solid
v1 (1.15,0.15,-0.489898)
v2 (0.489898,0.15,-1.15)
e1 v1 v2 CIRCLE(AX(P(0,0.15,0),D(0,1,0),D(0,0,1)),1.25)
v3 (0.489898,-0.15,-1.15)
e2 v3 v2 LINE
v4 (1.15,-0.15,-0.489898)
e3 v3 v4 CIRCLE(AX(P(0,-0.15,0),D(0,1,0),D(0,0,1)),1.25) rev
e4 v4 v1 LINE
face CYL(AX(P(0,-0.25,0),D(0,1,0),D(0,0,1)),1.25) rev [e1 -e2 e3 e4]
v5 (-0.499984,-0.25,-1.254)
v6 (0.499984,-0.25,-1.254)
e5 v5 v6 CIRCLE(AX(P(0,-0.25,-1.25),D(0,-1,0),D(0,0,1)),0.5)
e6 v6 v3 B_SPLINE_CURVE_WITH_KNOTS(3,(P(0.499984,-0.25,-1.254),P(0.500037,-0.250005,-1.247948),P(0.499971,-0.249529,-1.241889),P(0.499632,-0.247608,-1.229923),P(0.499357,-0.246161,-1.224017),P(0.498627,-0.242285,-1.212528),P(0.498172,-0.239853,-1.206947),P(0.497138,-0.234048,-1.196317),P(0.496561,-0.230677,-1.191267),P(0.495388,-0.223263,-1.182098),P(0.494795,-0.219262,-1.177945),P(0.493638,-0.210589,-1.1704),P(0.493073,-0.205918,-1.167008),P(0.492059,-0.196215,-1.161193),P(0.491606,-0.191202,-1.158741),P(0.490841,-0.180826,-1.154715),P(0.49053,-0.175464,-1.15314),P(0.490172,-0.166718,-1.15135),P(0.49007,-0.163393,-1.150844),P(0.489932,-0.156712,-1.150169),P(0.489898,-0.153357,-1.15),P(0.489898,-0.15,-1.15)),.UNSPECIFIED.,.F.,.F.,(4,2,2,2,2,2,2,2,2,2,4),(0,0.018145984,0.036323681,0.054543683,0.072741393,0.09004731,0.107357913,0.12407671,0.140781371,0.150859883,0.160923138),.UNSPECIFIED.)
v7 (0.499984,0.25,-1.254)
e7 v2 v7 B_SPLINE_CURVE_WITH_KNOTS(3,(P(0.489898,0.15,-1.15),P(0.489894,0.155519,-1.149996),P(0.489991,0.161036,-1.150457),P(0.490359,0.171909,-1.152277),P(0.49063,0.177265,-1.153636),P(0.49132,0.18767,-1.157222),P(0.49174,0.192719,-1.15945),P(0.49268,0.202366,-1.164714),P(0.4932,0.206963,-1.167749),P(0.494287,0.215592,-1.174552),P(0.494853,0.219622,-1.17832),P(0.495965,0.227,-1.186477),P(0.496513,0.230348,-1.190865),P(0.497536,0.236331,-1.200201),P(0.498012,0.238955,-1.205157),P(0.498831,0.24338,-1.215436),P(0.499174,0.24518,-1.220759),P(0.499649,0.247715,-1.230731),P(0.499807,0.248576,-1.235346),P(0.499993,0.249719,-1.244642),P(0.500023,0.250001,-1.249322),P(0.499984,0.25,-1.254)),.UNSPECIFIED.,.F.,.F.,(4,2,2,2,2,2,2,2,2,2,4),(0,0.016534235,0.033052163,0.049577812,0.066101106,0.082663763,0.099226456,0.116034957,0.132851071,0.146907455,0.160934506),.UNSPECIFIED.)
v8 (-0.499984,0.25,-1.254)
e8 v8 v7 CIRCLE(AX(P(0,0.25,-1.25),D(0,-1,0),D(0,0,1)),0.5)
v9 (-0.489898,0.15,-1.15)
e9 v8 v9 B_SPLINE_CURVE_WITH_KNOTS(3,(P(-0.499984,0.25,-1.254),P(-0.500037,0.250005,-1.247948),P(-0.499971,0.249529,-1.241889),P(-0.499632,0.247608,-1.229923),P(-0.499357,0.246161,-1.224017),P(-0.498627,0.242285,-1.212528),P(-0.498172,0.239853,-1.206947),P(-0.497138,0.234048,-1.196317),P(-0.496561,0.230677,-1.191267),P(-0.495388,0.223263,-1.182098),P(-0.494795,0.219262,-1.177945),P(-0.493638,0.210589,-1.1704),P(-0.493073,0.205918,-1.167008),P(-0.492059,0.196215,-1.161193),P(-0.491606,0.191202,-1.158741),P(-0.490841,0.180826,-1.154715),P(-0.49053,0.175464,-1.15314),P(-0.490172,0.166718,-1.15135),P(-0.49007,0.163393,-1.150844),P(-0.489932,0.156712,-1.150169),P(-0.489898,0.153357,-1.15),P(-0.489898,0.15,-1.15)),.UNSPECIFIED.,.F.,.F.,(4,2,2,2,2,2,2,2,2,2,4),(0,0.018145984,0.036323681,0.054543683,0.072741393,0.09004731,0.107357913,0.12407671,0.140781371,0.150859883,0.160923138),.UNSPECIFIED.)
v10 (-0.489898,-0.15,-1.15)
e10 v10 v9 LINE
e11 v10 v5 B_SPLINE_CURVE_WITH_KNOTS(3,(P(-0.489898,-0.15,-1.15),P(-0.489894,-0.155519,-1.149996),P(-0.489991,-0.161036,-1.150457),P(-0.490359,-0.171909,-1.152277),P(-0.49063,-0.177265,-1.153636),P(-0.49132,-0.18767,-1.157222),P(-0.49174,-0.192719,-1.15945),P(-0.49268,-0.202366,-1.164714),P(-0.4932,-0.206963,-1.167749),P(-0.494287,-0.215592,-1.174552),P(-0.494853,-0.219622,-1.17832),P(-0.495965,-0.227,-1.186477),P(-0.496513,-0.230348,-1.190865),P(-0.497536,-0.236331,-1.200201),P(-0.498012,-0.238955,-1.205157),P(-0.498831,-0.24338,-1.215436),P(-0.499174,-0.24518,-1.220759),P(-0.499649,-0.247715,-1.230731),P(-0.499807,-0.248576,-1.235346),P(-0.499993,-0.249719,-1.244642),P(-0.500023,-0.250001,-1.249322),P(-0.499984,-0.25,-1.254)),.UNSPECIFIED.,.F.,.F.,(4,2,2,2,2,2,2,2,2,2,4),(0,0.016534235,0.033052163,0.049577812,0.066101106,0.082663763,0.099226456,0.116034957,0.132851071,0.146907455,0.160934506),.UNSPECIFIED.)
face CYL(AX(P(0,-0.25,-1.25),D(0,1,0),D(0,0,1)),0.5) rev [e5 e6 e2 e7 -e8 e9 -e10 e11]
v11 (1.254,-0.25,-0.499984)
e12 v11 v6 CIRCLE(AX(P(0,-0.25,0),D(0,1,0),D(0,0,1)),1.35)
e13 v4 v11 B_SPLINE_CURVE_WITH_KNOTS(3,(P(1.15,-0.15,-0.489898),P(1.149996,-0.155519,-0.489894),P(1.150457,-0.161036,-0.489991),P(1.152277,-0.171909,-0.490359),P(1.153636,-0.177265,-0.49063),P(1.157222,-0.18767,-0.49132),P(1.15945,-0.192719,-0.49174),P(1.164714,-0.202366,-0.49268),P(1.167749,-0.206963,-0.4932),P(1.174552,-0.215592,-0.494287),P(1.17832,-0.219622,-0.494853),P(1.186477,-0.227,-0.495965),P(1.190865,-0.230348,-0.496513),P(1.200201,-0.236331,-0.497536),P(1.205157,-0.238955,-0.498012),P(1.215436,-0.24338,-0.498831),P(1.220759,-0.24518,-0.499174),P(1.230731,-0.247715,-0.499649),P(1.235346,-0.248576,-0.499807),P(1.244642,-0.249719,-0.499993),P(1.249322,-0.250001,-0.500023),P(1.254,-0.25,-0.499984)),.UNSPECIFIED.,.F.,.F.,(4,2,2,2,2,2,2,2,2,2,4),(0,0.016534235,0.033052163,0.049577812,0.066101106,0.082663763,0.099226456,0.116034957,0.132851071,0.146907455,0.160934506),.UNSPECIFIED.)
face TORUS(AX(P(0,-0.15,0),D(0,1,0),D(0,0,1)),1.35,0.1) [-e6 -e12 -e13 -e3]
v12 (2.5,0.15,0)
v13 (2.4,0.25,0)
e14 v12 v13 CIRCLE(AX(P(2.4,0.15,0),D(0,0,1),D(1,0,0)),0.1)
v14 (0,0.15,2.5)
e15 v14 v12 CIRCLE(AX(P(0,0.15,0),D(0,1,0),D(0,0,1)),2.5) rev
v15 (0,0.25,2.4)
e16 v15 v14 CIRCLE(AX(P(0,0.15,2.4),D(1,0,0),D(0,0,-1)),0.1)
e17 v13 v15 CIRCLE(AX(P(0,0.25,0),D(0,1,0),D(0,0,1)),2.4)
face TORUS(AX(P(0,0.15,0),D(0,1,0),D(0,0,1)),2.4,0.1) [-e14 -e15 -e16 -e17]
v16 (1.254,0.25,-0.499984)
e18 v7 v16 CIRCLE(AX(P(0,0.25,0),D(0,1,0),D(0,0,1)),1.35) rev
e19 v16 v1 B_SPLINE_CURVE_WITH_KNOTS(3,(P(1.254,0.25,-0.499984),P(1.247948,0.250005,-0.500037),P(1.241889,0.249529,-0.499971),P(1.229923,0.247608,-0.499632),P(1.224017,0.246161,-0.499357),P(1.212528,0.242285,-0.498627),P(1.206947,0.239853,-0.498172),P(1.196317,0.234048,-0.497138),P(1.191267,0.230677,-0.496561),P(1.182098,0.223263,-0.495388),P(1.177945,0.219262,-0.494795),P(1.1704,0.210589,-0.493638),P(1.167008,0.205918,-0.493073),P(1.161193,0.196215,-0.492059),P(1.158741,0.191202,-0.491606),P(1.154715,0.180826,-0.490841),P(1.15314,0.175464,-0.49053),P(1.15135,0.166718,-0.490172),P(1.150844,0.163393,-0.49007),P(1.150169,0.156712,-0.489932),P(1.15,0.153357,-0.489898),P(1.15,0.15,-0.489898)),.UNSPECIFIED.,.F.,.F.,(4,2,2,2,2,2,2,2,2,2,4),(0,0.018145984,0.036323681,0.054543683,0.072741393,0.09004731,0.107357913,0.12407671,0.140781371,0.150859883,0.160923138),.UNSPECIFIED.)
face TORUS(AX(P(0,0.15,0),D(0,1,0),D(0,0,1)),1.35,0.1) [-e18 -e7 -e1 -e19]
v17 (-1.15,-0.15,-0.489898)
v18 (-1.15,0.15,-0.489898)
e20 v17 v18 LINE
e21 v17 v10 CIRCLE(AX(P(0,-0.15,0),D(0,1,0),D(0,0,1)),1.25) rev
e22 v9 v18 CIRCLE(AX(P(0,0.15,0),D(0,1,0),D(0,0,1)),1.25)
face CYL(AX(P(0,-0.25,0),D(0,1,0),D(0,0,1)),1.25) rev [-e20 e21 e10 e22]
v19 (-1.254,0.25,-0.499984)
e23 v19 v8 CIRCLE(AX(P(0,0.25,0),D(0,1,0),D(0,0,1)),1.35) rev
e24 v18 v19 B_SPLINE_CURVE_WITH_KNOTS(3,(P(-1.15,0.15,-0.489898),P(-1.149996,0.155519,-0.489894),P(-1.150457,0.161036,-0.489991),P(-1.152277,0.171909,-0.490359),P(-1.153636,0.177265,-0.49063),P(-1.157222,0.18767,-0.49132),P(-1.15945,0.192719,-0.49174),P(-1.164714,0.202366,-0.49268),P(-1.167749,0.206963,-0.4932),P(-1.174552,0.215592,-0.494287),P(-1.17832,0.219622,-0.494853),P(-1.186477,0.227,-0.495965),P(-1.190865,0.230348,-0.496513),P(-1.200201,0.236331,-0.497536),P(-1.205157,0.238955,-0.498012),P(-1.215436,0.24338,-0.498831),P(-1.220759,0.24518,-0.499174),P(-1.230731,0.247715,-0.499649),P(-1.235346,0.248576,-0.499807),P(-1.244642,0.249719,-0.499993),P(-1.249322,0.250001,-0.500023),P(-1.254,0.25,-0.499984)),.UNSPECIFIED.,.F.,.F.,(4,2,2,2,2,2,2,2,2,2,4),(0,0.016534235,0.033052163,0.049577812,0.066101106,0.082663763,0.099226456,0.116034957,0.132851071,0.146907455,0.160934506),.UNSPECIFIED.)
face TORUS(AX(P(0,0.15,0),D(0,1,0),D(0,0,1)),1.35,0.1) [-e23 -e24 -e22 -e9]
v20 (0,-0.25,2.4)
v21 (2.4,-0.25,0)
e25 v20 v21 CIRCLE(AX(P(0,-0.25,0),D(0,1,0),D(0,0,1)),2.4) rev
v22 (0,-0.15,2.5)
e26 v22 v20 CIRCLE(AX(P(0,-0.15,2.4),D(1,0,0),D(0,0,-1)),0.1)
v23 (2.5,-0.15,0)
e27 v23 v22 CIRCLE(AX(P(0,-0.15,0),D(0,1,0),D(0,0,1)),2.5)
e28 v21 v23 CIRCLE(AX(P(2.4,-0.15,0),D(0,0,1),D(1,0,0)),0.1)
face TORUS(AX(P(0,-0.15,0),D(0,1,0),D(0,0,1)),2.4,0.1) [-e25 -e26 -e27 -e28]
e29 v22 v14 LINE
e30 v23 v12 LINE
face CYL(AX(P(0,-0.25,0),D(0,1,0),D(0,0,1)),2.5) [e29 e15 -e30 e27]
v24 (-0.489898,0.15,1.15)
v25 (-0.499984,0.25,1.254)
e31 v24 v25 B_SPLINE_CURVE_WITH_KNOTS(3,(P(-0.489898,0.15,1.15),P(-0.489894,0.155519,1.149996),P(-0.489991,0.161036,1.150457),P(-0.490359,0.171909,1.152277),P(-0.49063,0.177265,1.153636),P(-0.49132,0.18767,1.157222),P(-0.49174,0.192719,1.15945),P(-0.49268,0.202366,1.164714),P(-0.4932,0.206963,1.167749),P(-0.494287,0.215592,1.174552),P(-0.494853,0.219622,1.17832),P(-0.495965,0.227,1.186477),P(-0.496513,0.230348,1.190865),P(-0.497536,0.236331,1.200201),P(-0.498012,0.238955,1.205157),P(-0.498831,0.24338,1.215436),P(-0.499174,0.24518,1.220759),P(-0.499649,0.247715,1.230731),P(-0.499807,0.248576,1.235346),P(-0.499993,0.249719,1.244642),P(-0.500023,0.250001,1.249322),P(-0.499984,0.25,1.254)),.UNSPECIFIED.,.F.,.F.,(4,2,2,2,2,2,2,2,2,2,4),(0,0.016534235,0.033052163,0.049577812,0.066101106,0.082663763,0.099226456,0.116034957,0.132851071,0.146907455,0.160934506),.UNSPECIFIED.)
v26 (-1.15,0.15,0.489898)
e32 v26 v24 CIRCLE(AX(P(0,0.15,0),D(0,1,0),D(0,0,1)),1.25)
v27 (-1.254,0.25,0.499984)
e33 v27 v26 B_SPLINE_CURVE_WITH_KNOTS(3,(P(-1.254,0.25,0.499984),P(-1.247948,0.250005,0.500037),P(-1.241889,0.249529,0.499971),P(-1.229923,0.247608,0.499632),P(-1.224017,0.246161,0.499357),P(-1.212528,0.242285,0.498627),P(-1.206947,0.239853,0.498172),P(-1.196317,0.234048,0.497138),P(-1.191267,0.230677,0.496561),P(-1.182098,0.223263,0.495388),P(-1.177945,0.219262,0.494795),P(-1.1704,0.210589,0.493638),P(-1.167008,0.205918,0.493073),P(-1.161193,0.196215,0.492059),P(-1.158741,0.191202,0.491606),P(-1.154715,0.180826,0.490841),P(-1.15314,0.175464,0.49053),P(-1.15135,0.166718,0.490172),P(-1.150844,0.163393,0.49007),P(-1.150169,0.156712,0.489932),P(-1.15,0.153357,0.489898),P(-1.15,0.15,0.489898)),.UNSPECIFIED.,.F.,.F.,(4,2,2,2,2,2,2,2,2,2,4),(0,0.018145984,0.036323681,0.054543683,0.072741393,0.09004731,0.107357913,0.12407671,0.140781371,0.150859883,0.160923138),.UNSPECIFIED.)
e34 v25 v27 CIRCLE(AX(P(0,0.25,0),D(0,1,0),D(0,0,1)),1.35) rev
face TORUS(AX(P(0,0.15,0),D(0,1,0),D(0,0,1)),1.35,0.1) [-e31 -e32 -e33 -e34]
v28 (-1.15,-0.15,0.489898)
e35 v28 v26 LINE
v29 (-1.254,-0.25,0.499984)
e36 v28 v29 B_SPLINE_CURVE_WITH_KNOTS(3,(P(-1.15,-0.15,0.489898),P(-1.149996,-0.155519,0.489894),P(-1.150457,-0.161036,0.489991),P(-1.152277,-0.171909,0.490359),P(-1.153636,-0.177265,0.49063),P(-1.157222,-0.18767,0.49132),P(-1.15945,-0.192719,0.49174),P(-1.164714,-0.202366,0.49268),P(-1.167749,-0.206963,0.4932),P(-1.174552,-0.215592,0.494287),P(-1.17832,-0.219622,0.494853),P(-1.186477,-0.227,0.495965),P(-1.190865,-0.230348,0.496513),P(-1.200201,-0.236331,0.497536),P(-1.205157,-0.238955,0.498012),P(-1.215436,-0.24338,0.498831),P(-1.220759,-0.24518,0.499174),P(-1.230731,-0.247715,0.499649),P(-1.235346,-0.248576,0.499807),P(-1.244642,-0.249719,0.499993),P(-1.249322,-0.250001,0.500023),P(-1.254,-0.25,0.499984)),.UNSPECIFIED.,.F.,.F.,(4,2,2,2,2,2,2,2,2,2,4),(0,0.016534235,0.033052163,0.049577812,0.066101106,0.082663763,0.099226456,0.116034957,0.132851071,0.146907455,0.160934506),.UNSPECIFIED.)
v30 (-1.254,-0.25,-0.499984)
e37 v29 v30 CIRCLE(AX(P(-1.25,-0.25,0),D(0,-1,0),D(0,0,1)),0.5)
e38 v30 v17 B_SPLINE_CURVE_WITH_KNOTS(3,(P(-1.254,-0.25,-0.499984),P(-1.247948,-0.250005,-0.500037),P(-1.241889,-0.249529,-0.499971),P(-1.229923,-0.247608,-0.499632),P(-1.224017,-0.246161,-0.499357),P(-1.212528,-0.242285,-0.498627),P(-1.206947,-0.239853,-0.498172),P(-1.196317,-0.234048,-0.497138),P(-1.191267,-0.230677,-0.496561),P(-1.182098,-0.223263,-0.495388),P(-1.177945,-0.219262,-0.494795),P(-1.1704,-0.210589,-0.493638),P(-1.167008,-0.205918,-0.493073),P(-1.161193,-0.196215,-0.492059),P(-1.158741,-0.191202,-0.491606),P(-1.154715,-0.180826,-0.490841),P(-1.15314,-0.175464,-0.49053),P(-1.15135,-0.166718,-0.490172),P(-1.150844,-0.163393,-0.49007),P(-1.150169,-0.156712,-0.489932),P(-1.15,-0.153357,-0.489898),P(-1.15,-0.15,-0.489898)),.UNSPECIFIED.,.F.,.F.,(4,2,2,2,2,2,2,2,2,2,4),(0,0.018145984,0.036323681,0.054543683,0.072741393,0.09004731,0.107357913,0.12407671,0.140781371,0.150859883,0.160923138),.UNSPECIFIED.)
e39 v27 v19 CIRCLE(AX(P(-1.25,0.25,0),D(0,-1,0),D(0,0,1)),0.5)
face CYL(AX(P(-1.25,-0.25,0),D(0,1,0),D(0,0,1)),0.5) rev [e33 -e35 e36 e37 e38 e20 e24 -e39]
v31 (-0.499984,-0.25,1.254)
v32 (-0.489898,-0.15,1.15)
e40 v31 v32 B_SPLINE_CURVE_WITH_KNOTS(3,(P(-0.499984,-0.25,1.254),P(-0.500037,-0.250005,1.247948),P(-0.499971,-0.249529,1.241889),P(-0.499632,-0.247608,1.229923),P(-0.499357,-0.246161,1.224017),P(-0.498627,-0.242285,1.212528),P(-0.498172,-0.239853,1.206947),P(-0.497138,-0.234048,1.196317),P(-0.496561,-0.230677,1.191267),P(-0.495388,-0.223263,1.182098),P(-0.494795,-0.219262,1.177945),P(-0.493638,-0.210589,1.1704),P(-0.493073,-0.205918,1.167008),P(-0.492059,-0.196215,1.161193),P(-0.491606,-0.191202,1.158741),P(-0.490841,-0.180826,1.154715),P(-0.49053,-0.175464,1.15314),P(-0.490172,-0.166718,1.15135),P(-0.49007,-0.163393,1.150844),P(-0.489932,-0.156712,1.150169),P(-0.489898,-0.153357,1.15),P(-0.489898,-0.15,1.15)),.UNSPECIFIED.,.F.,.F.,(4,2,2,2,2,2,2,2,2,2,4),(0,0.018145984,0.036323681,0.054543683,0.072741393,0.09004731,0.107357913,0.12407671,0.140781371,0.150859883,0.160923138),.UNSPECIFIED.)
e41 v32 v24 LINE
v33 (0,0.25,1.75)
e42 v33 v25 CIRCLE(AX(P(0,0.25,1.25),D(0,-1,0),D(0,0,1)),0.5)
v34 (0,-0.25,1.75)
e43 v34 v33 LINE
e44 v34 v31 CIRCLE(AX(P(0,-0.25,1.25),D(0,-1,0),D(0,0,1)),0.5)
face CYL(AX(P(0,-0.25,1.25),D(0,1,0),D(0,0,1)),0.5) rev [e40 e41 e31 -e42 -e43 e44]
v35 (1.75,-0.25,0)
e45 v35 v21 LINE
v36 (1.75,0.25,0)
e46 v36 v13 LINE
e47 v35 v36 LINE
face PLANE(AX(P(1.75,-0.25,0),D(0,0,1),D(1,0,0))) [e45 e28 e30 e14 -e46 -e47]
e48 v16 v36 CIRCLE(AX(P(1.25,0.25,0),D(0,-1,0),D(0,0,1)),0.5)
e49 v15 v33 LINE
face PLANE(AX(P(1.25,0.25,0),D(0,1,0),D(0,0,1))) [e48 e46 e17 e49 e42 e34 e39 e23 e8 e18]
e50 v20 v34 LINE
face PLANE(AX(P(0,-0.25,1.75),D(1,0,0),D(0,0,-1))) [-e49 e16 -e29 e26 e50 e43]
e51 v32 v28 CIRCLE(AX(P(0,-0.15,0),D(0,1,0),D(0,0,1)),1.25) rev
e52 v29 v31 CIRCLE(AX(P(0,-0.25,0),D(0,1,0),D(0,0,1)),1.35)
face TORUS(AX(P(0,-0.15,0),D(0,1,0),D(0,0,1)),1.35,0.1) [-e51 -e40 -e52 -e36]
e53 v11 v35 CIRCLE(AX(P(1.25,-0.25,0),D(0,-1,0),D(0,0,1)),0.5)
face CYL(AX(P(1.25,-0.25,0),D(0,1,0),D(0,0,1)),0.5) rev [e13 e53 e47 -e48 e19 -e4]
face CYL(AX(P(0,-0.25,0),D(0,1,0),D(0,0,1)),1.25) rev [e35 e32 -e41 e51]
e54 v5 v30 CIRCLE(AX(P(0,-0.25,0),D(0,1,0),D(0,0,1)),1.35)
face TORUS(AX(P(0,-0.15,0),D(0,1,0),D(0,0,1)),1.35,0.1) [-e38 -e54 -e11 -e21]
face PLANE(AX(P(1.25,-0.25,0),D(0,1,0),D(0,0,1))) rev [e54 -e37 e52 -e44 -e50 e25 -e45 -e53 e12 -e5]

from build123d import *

# Parameters (mm, degrees)
BOSS_EXTRUDE1_DEPTH      = 0.25
BOSS_EXTRUDE1_DEPTH_BACK = 0.25
FILLET1_R                = 0.1


with BuildPart() as part:
    # Sketch1 → Boss-Extrude1 (new, two sides: drawn at the far end of the back side and taken through both)
    with BuildSketch(Plane(origin=(0, 0, 0), x_dir=(1, 0, 0), z_dir=(0, 1, 0)).offset(-BOSS_EXTRUDE1_DEPTH_BACK)):
        with BuildLine():
            Line((0, -1.75), (0, -2.5))
            ThreePointArc((0, -2.5), (-1.767766953, 1.767766953), (2.5, 0))
            Line((2.5, 0), (1.75, 0))
            ThreePointArc((1.75, 0), (1.566227766, 0.387298335), (1.15, 0.489897949))
            ThreePointArc((1.15, 0.489897949), (0.883883476, 0.883883476), (0.489897949, 1.15))
            ThreePointArc((0.489897949, 1.15), (0, 1.75), (-0.489897949, 1.15))
            ThreePointArc((-0.489897949, 1.15), (-0.883883476, 0.883883476), (-1.15, 0.489897949))
            ThreePointArc((-1.15, 0.489897949), (-1.75, 0), (-1.15, -0.489897949))
            ThreePointArc((-1.15, -0.489897949), (-0.883883476, -0.883883476), (-0.489897949, -1.15))
            ThreePointArc((-0.489897949, -1.15), (-0.387298335, -1.566227766), (0, -1.75))
        make_face()
    extrude(amount=BOSS_EXTRUDE1_DEPTH + BOSS_EXTRUDE1_DEPTH_BACK)

    # Fillet1
    # the kernel refuses this fillet: 0.1 mm, written as the material it takes off along each edge
    with BuildSketch(Plane(origin=(0, -0.25, 0), x_dir=(0.10019395208705734, 0, 0.9949679250936567), z_dir=(0.9949679250936567, 0, -0.10019395208705734))) as fillet1_piece_1:
        with BuildLine():
            CenterArc((2.5 - FILLET1_R, -FILLET1_R), FILLET1_R, 0, 90)
            Line((2.5 - FILLET1_R, 0), (2.5, 0))
            Line((2.5, 0), (2.5, -FILLET1_R))
        make_face()
    revolve(axis=Axis((0, -0.25, 0), (0, -1, 0)), revolution_arc=281.500678412, mode=Mode.SUBTRACT)
    with BuildSketch(Plane(origin=(0, -0.25, 0), x_dir=(-0.9795272488285965, 0, 0.2013116211307253), z_dir=(-0.2013116211307253, 0, -0.9795272488285965))) as fillet1_piece_2:
        with BuildLine():
            CenterArc((1.25 + FILLET1_R, FILLET1_R), FILLET1_R, 180, 90)
            Line((1.25 + FILLET1_R, 0), (1.25, 0))
            Line((1.25, 0), (1.25, FILLET1_R))
        make_face()
    revolve(axis=Axis((0, -0.25, 0), (0, 1, 0)), revolution_arc=66.772660904, mode=Mode.SUBTRACT)
    with BuildSketch(Plane(origin=(0, -0.25, 0), x_dir=(-0.20131162113072518, 0, -0.9795272488285967), z_dir=(0.9795272488285967, 0, -0.20131162113072518))) as fillet1_piece_3:
        with BuildLine():
            CenterArc((1.25 + FILLET1_R, FILLET1_R), FILLET1_R, 180, 90)
            Line((1.25 + FILLET1_R, 0), (1.25, 0))
            Line((1.25, 0), (1.25, FILLET1_R))
        make_face()
    revolve(axis=Axis((0, -0.25, 0), (0, 1, 0)), revolution_arc=66.772660904, mode=Mode.SUBTRACT)
    with BuildSketch(Plane(origin=(0, 0.25, 0), x_dir=(0.10019395208705734, 0, 0.9949679250936567), z_dir=(0.9949679250936567, 0, -0.10019395208705734))) as fillet1_piece_4:
        with BuildLine():
            CenterArc((2.5 - FILLET1_R, FILLET1_R), FILLET1_R, 270, 90)
            Line((2.5 - FILLET1_R, 0), (2.5, 0))
            Line((2.5, 0), (2.5, FILLET1_R))
        make_face()
    revolve(axis=Axis((0, 0.25, 0), (0, -1, 0)), revolution_arc=281.500678412, mode=Mode.SUBTRACT)
    with BuildSketch(Plane(origin=(0, 0.25, 0), x_dir=(-0.9795272488285965, 0, 0.2013116211307253), z_dir=(-0.2013116211307253, 0, -0.9795272488285965))) as fillet1_piece_5:
        with BuildLine():
            CenterArc((1.25 + FILLET1_R, -FILLET1_R), FILLET1_R, 90, 90)
            Line((1.25 + FILLET1_R, 0), (1.25, 0))
            Line((1.25, 0), (1.25, -FILLET1_R))
        make_face()
    revolve(axis=Axis((0, 0.25, 0), (0, 1, 0)), revolution_arc=66.772660904, mode=Mode.SUBTRACT)
    with BuildSketch(Plane(origin=(0, 0.25, 0), x_dir=(-0.20131162113072518, 0, -0.9795272488285967), z_dir=(0.9795272488285967, 0, -0.20131162113072518))) as fillet1_piece_6:
        with BuildLine():
            CenterArc((1.25 + FILLET1_R, -FILLET1_R), FILLET1_R, 90, 90)
            Line((1.25 + FILLET1_R, 0), (1.25, 0))
            Line((1.25, 0), (1.25, -FILLET1_R))
        make_face()
    revolve(axis=Axis((0, 0.25, 0), (0, 1, 0)), revolution_arc=66.772660904, mode=Mode.SUBTRACT)
    with BuildSketch(Plane(origin=(0, 0.25, 0), x_dir=(0.9795272488285964, 0, -0.20131162113072643), z_dir=(0.20131162113072643, 0, 0.9795272488285964))) as fillet1_piece_7:
        with BuildLine():
            CenterArc((1.25 + FILLET1_R, -FILLET1_R), FILLET1_R, 90, 90)
            Line((1.25 + FILLET1_R, 0), (1.25, 0))
            Line((1.25, 0), (1.25, -FILLET1_R))
        make_face()
    revolve(axis=Axis((0, 0.25, 0), (0, 1, 0)), revolution_arc=66.772660904, mode=Mode.SUBTRACT)
    with BuildSketch(Plane(origin=(0, -0.25, 0), x_dir=(0.9795272488285964, 0, -0.20131162113072643), z_dir=(0.20131162113072643, 0, 0.9795272488285964))) as fillet1_piece_8:
        with BuildLine():
            CenterArc((1.25 + FILLET1_R, FILLET1_R), FILLET1_R, 180, 90)
            Line((1.25 + FILLET1_R, 0), (1.25, 0))
            Line((1.25, 0), (1.25, FILLET1_R))
        make_face()
    revolve(axis=Axis((0, -0.25, 0), (0, 1, 0)), revolution_arc=66.772660904, mode=Mode.SUBTRACT)


solid = part.part
